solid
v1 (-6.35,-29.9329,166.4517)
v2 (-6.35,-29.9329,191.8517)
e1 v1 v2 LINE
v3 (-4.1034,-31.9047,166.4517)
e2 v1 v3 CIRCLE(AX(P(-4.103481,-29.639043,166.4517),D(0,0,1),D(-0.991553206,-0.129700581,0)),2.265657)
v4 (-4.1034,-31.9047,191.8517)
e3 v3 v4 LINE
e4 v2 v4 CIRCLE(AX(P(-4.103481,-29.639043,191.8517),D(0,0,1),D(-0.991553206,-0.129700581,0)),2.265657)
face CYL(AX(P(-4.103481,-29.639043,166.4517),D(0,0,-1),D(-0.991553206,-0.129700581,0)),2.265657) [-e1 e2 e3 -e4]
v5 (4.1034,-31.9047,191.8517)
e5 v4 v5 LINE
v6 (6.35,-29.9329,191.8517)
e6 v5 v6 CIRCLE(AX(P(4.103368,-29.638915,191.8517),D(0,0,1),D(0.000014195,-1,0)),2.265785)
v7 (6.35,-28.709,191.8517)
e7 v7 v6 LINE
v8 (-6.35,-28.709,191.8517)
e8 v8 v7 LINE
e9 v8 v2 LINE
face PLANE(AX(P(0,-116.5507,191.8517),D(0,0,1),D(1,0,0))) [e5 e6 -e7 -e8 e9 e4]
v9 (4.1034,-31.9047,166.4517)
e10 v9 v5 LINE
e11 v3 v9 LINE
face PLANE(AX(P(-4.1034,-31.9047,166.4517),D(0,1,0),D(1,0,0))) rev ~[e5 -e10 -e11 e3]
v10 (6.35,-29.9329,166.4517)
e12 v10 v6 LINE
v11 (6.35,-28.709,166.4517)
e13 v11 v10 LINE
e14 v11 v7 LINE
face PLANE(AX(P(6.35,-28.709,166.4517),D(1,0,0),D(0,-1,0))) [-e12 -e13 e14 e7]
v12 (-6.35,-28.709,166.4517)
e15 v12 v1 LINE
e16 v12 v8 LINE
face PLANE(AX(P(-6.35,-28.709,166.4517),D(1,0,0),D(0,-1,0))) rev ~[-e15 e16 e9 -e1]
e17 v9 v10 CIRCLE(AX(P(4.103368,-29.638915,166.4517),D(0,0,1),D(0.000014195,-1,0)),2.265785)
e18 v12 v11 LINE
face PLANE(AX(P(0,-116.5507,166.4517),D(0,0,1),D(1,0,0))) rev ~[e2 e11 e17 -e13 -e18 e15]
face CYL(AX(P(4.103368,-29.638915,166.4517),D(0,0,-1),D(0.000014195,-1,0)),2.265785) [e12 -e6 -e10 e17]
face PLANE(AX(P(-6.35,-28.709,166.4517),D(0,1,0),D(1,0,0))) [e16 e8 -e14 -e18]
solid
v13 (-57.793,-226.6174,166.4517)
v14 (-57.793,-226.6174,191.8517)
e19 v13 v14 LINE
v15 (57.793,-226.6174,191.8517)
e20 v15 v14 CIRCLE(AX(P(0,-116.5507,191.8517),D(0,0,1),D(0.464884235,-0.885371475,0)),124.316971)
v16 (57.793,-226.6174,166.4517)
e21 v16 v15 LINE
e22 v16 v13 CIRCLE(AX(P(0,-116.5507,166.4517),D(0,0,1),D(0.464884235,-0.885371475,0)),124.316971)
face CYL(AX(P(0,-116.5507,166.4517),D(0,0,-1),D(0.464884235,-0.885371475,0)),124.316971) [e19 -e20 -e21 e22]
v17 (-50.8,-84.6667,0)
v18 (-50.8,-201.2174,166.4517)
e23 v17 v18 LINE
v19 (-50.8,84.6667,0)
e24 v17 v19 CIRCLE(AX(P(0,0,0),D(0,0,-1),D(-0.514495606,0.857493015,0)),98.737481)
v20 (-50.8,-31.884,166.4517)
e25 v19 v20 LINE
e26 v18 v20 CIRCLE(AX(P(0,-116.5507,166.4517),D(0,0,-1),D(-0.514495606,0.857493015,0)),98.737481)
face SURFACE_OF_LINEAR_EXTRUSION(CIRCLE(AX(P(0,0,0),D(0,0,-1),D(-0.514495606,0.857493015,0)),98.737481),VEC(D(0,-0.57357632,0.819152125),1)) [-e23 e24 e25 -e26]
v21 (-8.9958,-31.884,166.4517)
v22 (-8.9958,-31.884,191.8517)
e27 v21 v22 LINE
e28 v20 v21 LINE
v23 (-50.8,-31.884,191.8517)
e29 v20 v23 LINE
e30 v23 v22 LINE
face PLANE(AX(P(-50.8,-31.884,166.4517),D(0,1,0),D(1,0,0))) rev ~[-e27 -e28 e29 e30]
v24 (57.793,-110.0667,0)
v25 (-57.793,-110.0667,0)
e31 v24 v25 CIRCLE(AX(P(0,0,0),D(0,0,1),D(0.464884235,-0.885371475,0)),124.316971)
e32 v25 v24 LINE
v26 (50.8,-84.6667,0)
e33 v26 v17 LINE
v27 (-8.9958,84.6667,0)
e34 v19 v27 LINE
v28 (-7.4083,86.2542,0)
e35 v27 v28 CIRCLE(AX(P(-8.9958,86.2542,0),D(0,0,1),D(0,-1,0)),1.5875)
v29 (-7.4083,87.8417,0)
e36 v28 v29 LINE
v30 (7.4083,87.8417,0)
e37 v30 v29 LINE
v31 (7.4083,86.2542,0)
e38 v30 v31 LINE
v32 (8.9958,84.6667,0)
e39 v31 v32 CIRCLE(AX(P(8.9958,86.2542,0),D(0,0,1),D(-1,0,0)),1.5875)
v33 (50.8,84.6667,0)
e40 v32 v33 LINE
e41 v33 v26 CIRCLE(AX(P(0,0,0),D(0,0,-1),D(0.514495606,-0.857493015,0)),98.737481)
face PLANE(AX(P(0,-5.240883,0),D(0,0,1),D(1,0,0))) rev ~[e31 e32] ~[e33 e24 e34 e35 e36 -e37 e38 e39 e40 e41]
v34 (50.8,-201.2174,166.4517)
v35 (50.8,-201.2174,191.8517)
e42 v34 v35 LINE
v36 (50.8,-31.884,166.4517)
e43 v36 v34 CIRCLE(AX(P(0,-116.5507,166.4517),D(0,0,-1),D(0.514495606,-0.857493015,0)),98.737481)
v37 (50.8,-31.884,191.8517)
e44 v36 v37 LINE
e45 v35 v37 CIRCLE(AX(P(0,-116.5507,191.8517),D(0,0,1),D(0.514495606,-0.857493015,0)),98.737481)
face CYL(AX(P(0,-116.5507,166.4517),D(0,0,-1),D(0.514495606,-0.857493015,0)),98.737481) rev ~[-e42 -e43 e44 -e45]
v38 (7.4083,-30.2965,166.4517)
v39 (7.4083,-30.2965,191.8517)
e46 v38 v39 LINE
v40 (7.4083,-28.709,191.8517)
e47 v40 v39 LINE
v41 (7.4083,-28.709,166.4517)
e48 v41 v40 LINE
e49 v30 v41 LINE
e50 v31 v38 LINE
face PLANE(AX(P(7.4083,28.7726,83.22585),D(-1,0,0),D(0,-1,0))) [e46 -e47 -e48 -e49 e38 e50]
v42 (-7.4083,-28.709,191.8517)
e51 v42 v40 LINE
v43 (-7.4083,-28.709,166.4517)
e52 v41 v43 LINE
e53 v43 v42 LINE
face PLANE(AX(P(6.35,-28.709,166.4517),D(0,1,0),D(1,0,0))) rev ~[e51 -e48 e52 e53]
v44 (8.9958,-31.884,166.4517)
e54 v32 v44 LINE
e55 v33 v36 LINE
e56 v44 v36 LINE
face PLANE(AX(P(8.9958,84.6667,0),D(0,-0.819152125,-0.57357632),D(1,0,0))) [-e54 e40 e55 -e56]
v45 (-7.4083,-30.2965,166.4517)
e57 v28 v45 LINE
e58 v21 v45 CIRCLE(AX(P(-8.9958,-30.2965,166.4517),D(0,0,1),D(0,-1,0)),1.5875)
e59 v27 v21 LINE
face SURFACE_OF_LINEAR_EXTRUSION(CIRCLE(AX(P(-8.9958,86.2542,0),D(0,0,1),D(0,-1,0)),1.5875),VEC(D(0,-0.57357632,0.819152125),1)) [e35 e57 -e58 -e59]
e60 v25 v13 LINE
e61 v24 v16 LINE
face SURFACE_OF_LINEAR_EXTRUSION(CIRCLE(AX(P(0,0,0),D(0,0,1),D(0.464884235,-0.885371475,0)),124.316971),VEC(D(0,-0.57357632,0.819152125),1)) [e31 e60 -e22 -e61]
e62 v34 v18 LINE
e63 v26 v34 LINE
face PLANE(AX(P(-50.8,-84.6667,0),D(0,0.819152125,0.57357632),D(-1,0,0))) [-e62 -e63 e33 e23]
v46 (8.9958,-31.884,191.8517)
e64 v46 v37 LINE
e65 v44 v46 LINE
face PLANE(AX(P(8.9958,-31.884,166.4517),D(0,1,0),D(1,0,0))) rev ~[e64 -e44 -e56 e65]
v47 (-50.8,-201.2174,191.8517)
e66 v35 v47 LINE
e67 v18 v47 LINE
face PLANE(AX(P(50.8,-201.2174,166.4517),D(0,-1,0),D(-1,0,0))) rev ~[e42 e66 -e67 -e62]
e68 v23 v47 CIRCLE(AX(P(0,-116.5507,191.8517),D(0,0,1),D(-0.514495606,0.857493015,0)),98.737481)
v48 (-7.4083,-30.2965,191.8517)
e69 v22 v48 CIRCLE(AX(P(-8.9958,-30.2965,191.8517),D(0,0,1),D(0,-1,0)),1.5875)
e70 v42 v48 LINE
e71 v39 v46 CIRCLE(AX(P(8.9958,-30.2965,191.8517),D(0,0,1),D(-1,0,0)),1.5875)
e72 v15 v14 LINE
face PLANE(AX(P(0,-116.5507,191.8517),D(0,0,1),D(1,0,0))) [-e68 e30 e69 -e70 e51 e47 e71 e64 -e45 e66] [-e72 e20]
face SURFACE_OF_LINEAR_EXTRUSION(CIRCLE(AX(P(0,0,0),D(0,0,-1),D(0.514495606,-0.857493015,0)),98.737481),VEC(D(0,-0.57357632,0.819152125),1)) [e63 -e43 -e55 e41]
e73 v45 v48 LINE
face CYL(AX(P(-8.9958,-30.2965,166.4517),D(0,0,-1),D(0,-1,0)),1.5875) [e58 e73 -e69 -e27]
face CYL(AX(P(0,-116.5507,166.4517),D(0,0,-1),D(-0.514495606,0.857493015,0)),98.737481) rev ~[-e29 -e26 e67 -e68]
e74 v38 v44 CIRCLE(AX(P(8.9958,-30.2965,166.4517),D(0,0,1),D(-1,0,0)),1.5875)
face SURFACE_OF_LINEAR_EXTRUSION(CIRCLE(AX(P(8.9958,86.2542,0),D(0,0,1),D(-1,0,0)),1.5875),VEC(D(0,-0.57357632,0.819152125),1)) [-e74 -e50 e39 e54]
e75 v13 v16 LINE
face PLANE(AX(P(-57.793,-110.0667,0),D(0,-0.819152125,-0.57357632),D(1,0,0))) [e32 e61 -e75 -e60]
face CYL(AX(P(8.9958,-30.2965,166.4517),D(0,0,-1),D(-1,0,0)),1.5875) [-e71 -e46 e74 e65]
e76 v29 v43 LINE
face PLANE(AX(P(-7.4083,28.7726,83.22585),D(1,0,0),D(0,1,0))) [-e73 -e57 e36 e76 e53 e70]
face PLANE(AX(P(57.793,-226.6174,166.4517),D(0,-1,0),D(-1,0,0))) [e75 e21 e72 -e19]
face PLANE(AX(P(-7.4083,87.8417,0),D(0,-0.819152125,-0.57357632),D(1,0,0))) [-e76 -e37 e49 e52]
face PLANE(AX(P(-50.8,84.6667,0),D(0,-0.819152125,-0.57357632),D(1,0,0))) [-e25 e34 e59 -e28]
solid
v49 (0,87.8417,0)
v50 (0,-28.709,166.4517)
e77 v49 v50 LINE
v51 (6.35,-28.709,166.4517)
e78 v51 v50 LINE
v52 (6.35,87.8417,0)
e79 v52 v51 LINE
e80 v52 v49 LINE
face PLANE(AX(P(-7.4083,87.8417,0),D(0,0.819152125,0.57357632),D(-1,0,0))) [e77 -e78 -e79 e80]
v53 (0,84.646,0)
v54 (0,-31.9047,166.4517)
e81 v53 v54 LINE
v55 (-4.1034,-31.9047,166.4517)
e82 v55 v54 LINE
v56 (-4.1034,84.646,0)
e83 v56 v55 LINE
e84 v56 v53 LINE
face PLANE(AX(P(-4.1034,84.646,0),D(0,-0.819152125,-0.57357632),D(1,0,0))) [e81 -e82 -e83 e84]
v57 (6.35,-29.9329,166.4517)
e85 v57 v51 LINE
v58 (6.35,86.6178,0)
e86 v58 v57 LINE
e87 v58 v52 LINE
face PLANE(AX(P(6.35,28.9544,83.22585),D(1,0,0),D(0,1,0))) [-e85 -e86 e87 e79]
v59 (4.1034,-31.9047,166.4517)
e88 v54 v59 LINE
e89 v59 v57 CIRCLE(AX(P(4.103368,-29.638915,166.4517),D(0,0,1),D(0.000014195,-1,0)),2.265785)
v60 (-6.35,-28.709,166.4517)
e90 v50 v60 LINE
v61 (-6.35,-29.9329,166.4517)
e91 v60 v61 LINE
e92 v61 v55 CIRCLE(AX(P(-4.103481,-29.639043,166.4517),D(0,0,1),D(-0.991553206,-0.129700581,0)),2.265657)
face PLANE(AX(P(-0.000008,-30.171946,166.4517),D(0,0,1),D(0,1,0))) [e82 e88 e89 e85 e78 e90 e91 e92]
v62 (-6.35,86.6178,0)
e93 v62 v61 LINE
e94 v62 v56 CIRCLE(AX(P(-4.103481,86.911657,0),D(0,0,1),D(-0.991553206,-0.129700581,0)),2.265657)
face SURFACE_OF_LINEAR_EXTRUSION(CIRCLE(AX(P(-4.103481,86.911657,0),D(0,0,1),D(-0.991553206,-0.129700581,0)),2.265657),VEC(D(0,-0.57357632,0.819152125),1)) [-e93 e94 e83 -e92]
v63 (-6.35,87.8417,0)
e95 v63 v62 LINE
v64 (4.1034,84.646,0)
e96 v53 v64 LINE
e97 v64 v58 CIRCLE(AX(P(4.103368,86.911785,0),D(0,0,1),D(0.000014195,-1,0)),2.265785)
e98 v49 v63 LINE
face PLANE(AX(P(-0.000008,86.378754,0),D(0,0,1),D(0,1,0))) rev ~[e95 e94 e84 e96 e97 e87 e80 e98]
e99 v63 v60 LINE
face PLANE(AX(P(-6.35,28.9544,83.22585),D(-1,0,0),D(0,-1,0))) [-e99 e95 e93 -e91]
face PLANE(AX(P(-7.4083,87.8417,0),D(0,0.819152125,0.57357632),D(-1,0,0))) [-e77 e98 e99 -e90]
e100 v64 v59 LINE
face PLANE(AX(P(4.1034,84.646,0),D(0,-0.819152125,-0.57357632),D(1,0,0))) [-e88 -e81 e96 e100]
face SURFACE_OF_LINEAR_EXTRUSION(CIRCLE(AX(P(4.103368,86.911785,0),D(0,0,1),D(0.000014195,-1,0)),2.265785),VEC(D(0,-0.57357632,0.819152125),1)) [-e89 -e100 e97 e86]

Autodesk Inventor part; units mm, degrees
ref_plane "YZ Plane" through (0, 0, 0) normal (1, 0, 0) x (0, 1, 0)
ref_plane "XZ Plane" through (0, 0, 0) normal (0, 1, 0) x (-1, 0, 0)
sketch "Sketch1" plane through (0, 0, 0) normal (0, 0, 1) x (1, 0, 0)
  line L0 (-50.8, -84.6667) -> (50.8, -84.6667)
  arc A0 (57.793, -110.0667) -> (-57.793, -110.0667) centre (0, 0) ccw
  arc A1 (-50.8, 84.6667) -> (-50.8, -84.6667) centre (0, 0) ccw
  arc A2 (50.8, -84.6667) -> (50.8, 84.6667) centre (0, 0) ccw
  line L1 (-57.793, -110.0667) -> (57.793, -110.0667)
  line L2 (0, 84.6667) -> (0, 87.8417) construction
  line L3 (-7.4083, 87.8417) -> (7.4083, 87.8417)
  line L4 (-7.4083, 87.8417) -> (-7.4083, 86.2542)
  line L5 (7.4083, 87.8417) -> (7.4083, 86.2542)
  line L6 (0, 84.6667) -> (8.9958, 84.6667) construction
  arc A3 (7.4083, 86.2542) -> (8.9958, 84.6667) centre (8.9958, 86.2542) ccw
  arc A4 (-8.9958, 84.6667) -> (-7.4083, 86.2542) centre (-8.9958, 86.2542) ccw
  line L7 (-50.8, 84.6667) -> (-8.9958, 84.6667)
  line L8 (8.9958, 84.6667) -> (50.8, 84.6667)
  line L9 (-8.9958, 84.6667) -> (0, 84.6667) construction
  line L10 (-6.35, 87.8417) -> (0, 87.8417)
  line L11 (7.4083, 87.8417) -> (-7.4083, 87.8417)
  line L12 (-6.35, 87.8417) -> (-6.35, 86.6178)
  line L13 (-4.1034, 84.646) -> (0, 84.646)
  line L14 (0, 84.646) -> (0, 87.8417) construction
  line L15 (-6.3485, 84.6667) -> (-3.1743, 87.8409) construction
  arc A5 (-3.1736, 84.646) -> (-6.35, 87.8417) centre (-6.3485, 84.6667) ccw construction
  arc A6 (-6.35, 86.6178) -> (-4.1034, 84.646) centre (-4.1034, 86.9117) ccw
  line L16 (6.35, 87.8417) -> (0, 87.8417)
  line L17 (6.35, 87.8417) -> (6.35, 86.6178)
  line L18 (4.1034, 84.646) -> (0, 84.646)
  line L19 (6.3485, 84.6667) -> (3.1743, 87.8409) construction
  arc A7 (6.35, 87.8417) -> (3.1736, 84.646) centre (6.3485, 84.6667) ccw construction
  arc A8 (4.1034, 84.646) -> (6.35, 86.6178) centre (4.1034, 86.9117) ccw
  dimension "d1" = 101.6
  dimension "d2" = 25.4
  dimension "d34" = 14.8167
  dimension "d35" = 1.5875
  dimension "d36" = 1.5875
  dimension "d38" = 6.35
  dimension "d39" = 3.175
  dimension "d40" = 45
  dimension "d41" = 2.2657
  dimension "d42" = 2.2466
ref_plane "Work Plane2" through (0, 0, 203.2) normal (0, 0, 1) x (1, 0, 0)
sketch "Sketch6" plane through (0, 0, 0) normal (1, 0, 0) x (0, 1, 0)
  line L0 (-110.0667, 0) -> (124.3169, 0) projected
  line L1 (-83.4784, 0) -> (-200.0291, 166.4517)
  point P0 (0, 0)
  dimension "d28" = 203.2
  dimension "d29" = 55
sweep "ramp" add profiles "Sketch1" path "Sketch6" path curves L1
sweep "light angle" add profiles "Sketch1" path "Sketch6" separate body path curves L1 contours L3 L17 A8 L18 L13 A6 L12
sketch "Sketch7" plane through (0, -116.5507, 166.4517) normal (0, 0, 1) x (1, 0, 0)
  arc A0 (-50.8, 84.6667) -> (-50.8, -84.6667) centre (0, 0) ccw projected
  arc A1 (57.793, -110.0667) -> (-57.793, -110.0667) centre (0, 0) ccw
  line L0 (50.8, -84.6667) -> (-50.8, -84.6667) projected
  line L1 (-50.8, -84.6667) -> (50.8, -84.6667)
  arc A2 (57.793, -110.0667) -> (-57.793, -110.0667) centre (0, 0) ccw projected
  line L2 (57.793, -110.0667) -> (-57.793, -110.0667)
  arc A3 (-50.8, 84.6667) -> (-50.8, -84.6667) centre (0, 0) ccw
  arc A4 (50.8, -84.6667) -> (50.8, 84.6667) centre (0, 0) ccw
  line L3 (-7.4083, 87.8417) -> (7.4083, 87.8417) projected
  line L4 (-7.4083, 87.8417) -> (7.4083, 87.8417)
  arc A5 (7.4083, 86.2542) -> (8.9958, 84.6667) centre (8.9958, 86.2542) ccw projected
  line L5 (7.4083, 87.8417) -> (7.4083, 86.2542)
  line L6 (-7.4083, 202.8049) -> (-7.4083, 86.2542) projected
  line L7 (-7.4083, 87.8417) -> (-7.4083, 86.2542)
  line L8 (-8.9958, 201.2174) -> (-8.9958, 84.6667) projected
  arc A6 (-8.9958, 84.6667) -> (-7.4083, 86.2542) centre (-8.9958, 86.2542) ccw projected
  arc A7 (-8.9958, 84.6667) -> (-7.4083, 86.2542) centre (-8.9958, 86.2542) ccw
  arc A8 (7.4083, 86.2542) -> (8.9958, 84.6667) centre (8.9958, 86.2542) ccw
  line L9 (-50.8, 84.6667) -> (-8.9958, 84.6667)
  line L10 (8.9958, 84.6667) -> (50.8, 84.6667)
  line L11 (-6.35, 87.8417) -> (-6.35, 86.6178) projected
  line L12 (-6.35, 87.8417) -> (-6.35, 86.6178)
  arc A9 (-6.35, 86.6178) -> (-4.1034, 84.646) centre (-4.1034, 86.9117) ccw projected
  arc A10 (4.1034, 84.646) -> (6.35, 86.6178) centre (4.1034, 86.9117) ccw projected
  line L13 (-4.1034, 84.646) -> (4.1034, 84.646)
  line L14 (6.35, 203.1686) -> (6.35, 86.6178) projected
  line L15 (6.35, 87.8417) -> (6.35, 86.6178)
  line L16 (-4.1034, 84.646) -> (4.1034, 84.646) projected
  arc A11 (-6.35, 86.6178) -> (-4.1034, 84.646) centre (-4.1034, 86.9117) ccw
  arc A12 (4.1034, 84.646) -> (6.35, 86.6178) centre (4.1034, 86.9117) ccw
  line L17 (-6.35, 87.8417) -> (6.35, 87.8417)
extrude "connection bottom" add sketch "Sketch7" along normal blind 25.4 contours A0 L0 A4 L10 A5 L5 L3 L14 A1 L2 L8 L9 | L8 A1 L6 A6 | A1 L14 L3 L6 bodies 1
extrude "light flat" add sketch "Sketch7" along normal blind 25.4 separate body contours L3 L14 A10 L13 A9 L11
equation "\"d35\" = 0.5 * d37"
equation "\"d37\" = 3.175"
properties part number "ramp bottom connect"
